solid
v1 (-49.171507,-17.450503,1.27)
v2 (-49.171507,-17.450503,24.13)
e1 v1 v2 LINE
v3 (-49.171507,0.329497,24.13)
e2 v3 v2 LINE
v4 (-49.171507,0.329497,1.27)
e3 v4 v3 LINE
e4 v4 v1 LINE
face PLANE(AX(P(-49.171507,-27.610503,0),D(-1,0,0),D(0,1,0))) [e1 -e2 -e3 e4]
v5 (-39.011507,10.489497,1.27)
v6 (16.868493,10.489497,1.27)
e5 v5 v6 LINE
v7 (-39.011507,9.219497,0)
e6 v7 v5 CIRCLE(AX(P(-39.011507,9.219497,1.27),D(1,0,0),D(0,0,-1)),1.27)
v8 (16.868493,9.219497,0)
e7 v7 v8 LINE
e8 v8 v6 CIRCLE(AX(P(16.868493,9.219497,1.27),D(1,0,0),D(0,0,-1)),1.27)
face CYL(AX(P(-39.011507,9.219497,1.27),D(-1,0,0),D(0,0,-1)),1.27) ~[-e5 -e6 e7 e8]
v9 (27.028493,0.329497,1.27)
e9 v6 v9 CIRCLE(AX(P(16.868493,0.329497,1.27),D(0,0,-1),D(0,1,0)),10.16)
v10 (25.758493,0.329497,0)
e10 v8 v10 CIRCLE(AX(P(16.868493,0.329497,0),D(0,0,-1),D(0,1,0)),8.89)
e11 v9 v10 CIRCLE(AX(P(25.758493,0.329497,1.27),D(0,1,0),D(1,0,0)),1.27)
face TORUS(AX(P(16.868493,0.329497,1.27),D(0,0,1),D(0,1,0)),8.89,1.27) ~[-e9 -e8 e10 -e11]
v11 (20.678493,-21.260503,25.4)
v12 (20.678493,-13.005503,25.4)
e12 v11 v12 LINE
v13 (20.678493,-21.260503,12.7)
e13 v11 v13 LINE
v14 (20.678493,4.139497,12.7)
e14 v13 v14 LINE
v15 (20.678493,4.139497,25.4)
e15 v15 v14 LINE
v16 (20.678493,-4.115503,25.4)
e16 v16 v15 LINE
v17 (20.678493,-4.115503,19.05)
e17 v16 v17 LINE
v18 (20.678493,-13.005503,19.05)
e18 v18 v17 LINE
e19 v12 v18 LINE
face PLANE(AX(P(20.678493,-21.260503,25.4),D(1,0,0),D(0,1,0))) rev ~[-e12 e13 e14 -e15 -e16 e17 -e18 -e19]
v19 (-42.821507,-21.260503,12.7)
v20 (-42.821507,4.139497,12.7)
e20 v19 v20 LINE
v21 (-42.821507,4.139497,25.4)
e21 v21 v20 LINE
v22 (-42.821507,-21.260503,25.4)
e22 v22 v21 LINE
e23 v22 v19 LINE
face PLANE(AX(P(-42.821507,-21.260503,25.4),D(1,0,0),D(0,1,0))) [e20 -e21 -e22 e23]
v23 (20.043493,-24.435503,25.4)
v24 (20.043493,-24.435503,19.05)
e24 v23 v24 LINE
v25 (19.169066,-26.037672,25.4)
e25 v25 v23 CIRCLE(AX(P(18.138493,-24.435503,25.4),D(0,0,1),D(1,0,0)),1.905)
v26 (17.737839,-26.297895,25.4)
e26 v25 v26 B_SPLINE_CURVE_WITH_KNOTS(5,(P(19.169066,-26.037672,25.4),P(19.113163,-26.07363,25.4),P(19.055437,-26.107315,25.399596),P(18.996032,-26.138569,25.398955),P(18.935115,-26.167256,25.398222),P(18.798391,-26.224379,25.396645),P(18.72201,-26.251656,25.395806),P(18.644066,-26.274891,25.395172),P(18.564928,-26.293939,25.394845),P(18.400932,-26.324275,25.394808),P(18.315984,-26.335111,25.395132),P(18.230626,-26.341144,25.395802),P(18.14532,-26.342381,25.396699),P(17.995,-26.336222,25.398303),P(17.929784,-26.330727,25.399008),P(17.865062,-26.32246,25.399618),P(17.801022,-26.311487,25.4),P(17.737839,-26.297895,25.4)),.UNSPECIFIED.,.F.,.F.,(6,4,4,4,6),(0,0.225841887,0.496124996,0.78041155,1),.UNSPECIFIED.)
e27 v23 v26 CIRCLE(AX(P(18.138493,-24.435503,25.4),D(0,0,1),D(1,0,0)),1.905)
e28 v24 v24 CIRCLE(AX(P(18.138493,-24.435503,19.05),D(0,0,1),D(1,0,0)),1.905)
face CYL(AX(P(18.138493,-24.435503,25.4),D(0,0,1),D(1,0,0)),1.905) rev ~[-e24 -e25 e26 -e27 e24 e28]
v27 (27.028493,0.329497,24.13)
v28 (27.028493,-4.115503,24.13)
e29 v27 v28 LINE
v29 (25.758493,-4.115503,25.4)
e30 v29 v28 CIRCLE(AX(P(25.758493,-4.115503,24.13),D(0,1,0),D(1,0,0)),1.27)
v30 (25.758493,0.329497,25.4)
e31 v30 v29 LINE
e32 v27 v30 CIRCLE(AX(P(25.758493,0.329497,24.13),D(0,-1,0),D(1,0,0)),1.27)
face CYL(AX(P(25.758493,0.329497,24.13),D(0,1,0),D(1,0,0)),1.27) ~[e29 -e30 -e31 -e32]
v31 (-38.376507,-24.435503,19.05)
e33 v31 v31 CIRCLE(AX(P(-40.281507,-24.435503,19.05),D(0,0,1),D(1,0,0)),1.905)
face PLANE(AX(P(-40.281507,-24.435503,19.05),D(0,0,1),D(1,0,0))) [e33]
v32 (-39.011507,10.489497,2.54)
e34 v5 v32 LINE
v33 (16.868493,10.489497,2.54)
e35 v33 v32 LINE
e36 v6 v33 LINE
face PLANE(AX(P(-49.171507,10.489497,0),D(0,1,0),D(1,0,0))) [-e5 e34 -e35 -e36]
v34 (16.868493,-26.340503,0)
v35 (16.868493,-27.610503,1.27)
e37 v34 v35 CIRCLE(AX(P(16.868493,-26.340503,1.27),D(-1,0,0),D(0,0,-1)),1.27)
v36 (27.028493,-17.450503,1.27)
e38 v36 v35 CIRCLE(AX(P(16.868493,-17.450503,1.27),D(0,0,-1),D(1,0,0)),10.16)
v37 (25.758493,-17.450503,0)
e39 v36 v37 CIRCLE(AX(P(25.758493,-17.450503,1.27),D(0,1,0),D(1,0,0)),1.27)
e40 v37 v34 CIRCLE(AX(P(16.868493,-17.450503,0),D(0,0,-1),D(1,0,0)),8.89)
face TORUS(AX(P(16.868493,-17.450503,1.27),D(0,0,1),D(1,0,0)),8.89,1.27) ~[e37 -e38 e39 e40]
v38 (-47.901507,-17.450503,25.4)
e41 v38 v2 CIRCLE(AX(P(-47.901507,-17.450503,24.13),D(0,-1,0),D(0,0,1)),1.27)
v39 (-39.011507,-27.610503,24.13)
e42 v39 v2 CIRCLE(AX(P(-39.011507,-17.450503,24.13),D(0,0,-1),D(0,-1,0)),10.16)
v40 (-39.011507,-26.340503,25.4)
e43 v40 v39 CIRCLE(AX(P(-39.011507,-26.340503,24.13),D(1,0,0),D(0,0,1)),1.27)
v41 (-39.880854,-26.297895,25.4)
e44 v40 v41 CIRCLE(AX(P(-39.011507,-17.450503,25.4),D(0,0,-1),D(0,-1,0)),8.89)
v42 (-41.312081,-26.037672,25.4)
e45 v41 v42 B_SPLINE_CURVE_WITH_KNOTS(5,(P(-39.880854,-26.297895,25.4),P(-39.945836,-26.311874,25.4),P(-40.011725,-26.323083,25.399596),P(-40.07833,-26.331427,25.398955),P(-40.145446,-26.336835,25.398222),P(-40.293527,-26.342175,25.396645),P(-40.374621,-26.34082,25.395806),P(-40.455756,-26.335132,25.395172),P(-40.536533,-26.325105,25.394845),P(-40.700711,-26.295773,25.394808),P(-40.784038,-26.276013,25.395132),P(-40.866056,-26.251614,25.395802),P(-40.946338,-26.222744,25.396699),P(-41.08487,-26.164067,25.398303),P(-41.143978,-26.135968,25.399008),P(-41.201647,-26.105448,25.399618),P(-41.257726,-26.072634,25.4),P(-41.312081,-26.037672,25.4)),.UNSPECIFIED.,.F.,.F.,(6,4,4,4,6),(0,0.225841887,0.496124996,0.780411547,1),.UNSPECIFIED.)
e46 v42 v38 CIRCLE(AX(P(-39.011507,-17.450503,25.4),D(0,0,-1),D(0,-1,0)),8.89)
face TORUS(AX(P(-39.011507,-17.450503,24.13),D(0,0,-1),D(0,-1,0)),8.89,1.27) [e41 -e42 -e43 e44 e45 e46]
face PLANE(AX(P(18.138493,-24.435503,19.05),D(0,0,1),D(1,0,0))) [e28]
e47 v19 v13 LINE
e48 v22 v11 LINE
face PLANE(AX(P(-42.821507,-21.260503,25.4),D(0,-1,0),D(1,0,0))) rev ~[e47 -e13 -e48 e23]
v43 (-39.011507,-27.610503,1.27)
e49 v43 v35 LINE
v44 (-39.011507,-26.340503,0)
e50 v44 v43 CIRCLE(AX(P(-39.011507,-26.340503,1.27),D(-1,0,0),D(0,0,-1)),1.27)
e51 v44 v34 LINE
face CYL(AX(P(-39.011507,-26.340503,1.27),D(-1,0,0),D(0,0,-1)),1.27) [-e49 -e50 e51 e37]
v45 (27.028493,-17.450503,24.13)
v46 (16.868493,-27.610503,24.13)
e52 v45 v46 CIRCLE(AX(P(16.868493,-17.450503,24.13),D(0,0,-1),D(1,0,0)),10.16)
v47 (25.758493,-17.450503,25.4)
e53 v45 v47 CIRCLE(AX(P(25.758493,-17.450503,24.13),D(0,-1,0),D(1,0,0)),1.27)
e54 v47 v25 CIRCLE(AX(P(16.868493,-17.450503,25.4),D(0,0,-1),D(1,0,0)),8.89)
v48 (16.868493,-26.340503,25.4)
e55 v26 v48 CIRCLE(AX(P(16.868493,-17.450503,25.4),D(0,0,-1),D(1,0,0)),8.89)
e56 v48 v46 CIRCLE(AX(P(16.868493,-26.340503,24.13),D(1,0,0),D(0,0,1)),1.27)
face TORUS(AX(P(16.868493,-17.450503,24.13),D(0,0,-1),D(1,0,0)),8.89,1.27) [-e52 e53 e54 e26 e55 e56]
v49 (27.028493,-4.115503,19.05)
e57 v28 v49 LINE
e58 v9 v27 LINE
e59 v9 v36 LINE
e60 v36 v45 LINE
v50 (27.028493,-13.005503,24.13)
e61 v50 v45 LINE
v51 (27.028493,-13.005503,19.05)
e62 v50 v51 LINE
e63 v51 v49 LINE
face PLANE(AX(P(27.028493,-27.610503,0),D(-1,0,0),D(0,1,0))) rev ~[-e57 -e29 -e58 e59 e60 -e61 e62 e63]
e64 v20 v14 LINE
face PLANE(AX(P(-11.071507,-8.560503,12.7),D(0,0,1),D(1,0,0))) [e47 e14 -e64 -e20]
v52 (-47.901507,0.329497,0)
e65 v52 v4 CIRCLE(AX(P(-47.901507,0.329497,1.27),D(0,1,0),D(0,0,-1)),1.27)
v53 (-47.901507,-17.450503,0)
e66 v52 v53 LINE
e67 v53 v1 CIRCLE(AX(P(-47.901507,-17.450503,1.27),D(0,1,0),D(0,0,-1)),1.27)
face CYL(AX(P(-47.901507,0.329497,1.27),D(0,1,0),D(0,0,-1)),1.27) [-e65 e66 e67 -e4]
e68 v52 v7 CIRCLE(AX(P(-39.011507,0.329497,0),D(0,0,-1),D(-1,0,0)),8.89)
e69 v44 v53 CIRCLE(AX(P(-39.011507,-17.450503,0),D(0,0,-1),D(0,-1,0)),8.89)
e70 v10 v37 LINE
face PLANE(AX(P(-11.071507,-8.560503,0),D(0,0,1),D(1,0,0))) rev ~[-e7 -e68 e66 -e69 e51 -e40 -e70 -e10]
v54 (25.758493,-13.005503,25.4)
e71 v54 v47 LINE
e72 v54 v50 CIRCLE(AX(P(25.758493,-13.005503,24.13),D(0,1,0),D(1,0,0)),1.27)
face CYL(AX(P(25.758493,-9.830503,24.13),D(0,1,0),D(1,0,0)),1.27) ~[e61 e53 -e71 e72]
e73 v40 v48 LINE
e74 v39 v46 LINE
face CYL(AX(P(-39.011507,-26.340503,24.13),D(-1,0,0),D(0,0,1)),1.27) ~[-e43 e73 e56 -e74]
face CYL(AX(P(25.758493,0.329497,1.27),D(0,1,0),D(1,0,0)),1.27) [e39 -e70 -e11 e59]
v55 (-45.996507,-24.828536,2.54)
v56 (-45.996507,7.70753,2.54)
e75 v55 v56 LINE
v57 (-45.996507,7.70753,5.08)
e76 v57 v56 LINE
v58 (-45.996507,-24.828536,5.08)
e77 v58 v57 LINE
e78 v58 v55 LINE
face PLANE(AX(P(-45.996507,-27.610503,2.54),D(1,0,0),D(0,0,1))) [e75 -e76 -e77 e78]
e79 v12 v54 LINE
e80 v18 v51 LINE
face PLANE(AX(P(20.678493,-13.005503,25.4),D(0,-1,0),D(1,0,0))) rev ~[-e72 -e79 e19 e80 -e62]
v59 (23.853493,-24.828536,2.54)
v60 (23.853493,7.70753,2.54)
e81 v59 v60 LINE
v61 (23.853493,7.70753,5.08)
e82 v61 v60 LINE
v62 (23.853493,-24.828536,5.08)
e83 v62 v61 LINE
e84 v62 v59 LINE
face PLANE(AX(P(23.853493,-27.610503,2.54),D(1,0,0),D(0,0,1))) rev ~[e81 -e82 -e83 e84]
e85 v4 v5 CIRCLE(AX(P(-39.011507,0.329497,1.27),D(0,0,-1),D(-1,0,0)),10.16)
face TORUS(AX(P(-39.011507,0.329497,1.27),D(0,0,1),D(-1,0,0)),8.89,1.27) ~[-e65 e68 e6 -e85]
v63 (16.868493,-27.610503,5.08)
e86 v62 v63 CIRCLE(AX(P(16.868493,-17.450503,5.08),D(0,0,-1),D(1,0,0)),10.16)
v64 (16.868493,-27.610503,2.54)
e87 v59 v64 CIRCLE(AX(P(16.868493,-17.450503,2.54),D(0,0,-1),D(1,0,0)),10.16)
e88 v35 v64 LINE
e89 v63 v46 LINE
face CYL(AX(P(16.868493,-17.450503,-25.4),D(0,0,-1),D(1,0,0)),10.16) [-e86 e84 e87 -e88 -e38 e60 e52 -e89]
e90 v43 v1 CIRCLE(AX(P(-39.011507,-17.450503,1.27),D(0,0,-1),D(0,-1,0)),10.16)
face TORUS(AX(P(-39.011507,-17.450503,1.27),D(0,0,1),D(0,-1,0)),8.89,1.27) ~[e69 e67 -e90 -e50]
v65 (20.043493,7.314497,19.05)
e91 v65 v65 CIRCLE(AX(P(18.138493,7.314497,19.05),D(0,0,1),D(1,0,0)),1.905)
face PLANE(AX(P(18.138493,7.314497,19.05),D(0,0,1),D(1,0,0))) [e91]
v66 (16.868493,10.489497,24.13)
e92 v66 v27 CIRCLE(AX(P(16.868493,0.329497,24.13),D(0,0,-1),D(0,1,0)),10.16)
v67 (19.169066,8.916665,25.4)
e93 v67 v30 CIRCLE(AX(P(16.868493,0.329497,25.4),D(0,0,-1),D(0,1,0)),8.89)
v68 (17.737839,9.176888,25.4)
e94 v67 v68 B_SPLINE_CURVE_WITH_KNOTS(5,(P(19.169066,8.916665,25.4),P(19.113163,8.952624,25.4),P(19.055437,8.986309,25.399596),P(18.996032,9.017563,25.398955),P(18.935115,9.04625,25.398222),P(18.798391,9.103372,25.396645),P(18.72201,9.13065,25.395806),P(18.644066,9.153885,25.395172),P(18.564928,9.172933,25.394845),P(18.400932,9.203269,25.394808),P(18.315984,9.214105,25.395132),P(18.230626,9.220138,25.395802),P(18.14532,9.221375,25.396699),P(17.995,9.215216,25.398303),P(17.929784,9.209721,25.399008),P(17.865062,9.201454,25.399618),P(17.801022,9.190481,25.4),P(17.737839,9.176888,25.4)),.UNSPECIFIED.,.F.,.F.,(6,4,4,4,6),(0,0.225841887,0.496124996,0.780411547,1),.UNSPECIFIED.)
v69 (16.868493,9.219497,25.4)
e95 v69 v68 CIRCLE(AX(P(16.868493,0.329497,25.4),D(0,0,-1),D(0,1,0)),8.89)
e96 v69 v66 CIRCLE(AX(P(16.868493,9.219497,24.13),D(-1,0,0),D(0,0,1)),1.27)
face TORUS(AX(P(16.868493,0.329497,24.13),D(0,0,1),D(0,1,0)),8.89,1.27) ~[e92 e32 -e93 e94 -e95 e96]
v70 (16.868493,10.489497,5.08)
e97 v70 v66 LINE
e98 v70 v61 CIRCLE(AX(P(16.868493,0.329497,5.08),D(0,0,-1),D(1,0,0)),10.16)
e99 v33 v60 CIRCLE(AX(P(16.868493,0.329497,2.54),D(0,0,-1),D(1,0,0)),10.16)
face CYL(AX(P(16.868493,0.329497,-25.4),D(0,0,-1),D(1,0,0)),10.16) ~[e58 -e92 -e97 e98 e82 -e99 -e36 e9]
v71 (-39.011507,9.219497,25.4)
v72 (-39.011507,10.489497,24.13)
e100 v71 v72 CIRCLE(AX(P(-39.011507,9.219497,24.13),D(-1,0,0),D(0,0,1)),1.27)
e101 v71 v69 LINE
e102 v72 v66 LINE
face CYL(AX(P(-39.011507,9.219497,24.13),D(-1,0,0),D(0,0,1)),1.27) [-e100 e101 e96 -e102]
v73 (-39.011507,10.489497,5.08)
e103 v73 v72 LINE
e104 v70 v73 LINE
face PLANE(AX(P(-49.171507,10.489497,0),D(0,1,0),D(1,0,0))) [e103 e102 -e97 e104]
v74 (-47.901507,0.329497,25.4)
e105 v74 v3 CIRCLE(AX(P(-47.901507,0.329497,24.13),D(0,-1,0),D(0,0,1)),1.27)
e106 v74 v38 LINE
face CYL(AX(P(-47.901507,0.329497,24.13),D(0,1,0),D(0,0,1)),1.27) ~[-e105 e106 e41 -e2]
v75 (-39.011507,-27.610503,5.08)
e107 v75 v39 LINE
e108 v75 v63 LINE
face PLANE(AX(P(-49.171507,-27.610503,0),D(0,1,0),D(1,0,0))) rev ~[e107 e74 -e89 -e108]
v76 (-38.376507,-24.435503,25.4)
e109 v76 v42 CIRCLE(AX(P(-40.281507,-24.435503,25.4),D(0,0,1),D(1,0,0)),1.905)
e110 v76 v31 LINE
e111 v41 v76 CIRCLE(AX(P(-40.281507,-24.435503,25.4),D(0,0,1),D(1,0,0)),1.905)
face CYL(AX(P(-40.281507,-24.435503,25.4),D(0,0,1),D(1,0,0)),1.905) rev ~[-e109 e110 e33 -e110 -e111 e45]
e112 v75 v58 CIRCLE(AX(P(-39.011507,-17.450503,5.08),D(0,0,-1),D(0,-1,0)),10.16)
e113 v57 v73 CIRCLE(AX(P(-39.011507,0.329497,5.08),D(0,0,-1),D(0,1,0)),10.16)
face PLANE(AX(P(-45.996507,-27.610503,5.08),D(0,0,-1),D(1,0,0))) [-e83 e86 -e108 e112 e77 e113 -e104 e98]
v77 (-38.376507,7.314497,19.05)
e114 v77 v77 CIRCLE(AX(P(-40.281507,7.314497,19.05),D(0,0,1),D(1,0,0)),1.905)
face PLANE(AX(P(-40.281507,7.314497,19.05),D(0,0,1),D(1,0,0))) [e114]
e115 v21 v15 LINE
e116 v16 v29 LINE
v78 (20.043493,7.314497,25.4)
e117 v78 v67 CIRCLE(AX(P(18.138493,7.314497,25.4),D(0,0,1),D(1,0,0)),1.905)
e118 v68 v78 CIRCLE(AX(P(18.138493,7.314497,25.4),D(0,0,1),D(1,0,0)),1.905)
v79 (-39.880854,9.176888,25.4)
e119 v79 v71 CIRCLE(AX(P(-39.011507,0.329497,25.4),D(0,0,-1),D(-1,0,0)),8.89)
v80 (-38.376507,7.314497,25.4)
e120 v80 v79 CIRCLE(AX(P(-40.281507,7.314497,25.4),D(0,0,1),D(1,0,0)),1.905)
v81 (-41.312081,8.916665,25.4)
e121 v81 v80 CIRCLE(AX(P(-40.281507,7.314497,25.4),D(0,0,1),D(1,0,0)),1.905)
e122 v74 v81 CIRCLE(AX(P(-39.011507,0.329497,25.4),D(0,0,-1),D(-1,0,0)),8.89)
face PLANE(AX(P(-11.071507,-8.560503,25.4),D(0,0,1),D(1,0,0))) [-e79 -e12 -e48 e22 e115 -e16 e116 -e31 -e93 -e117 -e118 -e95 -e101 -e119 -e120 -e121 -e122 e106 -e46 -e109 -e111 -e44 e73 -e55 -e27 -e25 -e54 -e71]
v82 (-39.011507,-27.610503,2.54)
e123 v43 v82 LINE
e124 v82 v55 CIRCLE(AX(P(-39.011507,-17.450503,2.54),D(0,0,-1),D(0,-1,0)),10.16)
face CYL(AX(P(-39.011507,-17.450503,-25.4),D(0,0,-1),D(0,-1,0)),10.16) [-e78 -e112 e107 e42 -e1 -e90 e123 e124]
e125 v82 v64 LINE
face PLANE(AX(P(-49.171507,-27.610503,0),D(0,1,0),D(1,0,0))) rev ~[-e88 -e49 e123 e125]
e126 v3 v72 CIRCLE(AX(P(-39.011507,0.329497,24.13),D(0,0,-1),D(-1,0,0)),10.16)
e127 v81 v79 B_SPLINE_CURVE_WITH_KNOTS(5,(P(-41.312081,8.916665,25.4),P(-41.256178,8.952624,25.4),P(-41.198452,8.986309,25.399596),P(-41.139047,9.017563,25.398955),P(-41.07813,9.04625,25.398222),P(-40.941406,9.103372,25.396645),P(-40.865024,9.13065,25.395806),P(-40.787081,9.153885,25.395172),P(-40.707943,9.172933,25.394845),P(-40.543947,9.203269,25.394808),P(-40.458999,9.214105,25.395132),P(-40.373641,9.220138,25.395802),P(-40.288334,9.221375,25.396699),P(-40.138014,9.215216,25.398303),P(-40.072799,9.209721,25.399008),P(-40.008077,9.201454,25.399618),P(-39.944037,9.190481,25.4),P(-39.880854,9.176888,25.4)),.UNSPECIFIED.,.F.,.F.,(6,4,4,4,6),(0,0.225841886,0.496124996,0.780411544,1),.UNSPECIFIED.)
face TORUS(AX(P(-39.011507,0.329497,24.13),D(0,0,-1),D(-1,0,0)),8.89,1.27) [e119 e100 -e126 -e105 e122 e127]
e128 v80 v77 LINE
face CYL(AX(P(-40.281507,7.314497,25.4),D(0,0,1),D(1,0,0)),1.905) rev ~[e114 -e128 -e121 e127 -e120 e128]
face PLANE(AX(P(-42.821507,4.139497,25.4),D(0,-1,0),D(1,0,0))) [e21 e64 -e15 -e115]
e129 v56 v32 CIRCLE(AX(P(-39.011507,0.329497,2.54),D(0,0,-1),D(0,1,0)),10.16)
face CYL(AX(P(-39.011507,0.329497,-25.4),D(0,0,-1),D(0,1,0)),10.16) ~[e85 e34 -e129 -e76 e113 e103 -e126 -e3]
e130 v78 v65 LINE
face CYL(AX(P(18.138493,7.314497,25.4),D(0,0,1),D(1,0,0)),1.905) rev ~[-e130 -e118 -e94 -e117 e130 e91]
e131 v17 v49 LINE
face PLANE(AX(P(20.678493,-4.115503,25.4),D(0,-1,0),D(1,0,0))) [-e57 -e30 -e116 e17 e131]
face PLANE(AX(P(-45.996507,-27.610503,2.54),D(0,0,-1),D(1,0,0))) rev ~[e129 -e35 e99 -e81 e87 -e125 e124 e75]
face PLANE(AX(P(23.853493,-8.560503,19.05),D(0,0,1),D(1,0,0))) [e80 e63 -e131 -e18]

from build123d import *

# Parameters (mm, degrees)
F0_W          = 76.2
F0_H          = 38.1
F1_DEPTH      = 25.4
F2_W          = 69.85
F2_H          = 2.54
F3_DEPTH      = 38.101
F4_W          = 63.5
F4_H          = 25.4
F5_DEPTH      = 12.7
F6_W          = 6.35
F6_H          = 8.89
F7_DEPTH      = 6.35
F8_R          = 1.905
F9_DEPTH      = 6.35
F10_T1_DEPTH  = 76.2
F11_T1_DEPTH  = 17.78
F11_T3_DEPTH  = 55.88
F11_T5_DEPTH  = 7.62
F11_T7_DEPTH  = 7.62
F11_T10_ANGLE = 90.0000000017
F11_T12_ANGLE = 89.9999999998
F11_T14_ANGLE = 89.9999999979
F11_T16_ANGLE = 89.9999999998
F11_T18_ANGLE = 89.9999999998
F11_T20_ANGLE = 89.9999999998
F11_T22_ANGLE = 89.9999999979
F11_T24_ANGLE = 90.0000000017


# Not quite as in the source:
# - a fillet or chamfer that OpenCascade refuses, or shapes differently, is made with other operations: its cross-section is extruded or revolved along the edge and cut away or added


with BuildPart() as f1:
    # F0 (on Top) → F1 (new body)
    with BuildSketch(Plane.XY):
        with Locations((-11.0715073586, -8.5605031371)):
            Rectangle(F0_W, F0_H)
    extrude(amount=F1_DEPTH)

    # F2 (on face) → F3 (cut, through all)
    with BuildSketch(Plane.XZ.offset(27.6105031371)):
        with Locations((-11.0715073586, 3.81)):
            Rectangle(F2_W, F2_H)
    extrude(amount=-F3_DEPTH, mode=Mode.SUBTRACT)

    # F4 (on face) → F5 (cut)
    with BuildSketch(Plane.XY.offset(25.4)):
        with Locations((-11.0715073586, -8.5605031371)):
            Rectangle(F4_W, F4_H)
    extrude(amount=-F5_DEPTH, mode=Mode.SUBTRACT)

    # F6 (on face) → F7 (cut)
    with BuildSketch(Plane.XY.offset(25.4)):
        with Locations((23.8534926414, -8.5605031371)):
            Rectangle(F6_W, F6_H)
    extrude(amount=-F7_DEPTH, mode=Mode.SUBTRACT)

    # F8 (on face) → F9 (cut)
    with BuildSketch(Plane.XY.offset(25.4)):
        with Locations((-40.2815073586, 7.3144968629)):
            Circle(F8_R)
        with Locations((18.1384926414, 7.3144968629)):
            Circle(F8_R)
        with Locations((-40.2815073586, -24.4355031371)):
            Circle(F8_R)
        with Locations((18.1384926414, -24.4355031371)):
            Circle(F8_R)
    extrude(amount=-F9_DEPTH, mode=Mode.SUBTRACT)

    # F10: fillet of radius 10.16 on 4 edges, made by hand

    # F10_s2 → F10_t1 (cut)
    with BuildSketch(Plane.XY.offset(-25.4)):
        with BuildLine():
            ThreePointArc((-39.0115073586, -27.6105031371), (-46.1957122554, -24.634708034), (-49.1715073586, -17.4505031371))
            Line((-49.1715073586, -17.4505031371), (-49.1715073586, -27.6105031371))
            Line((-49.1715073586, -27.6105031371), (-39.0115073586, -27.6105031371))
        make_face()
        with BuildLine():
            ThreePointArc((27.0284926414, -17.4505031371), (24.0526975383, -24.634708034), (16.8684926414, -27.6105031371))
            Line((16.8684926414, -27.6105031371), (27.0284926414, -27.6105031371))
            Line((27.0284926414, -27.6105031371), (27.0284926414, -17.4505031371))
        make_face()
        with BuildLine():
            ThreePointArc((27.0284926414, 0.3294968629), (24.0526975383, 7.5137017597), (16.8684926414, 10.4894968629))
            Line((16.8684926414, 10.4894968629), (27.0284926414, 10.4894968629))
            Line((27.0284926414, 10.4894968629), (27.0284926414, 0.3294968629))
        make_face()
        with BuildLine():
            ThreePointArc((-39.0115073586, 10.4894968629), (-46.1957122554, 7.5137017597), (-49.1715073586, 0.3294968629))
            Line((-49.1715073586, 0.3294968629), (-49.1715073586, 10.4894968629))
            Line((-49.1715073586, 10.4894968629), (-39.0115073586, 10.4894968629))
        make_face()
    extrude(amount=F10_T1_DEPTH, mode=Mode.SUBTRACT)

    # F11: fillet of radius 1.27 on 17 edges, made by hand

    # F11_s2 → F11_t1 (cut)
    with BuildSketch(Plane.XZ.offset(-0.3294968629)):
        with BuildLine():
            ThreePointArc((-47.9015073586, 25.4), (-48.7995329707, 25.0280256121), (-49.1715073586, 24.13))
            Line((-49.1715073586, 24.13), (-49.1715073586, 25.4))
            Line((-49.1715073586, 25.4), (-47.9015073586, 25.4))
        make_face()
        with BuildLine():
            ThreePointArc((27.0284926414, 1.27), (26.6565182536, 0.3719743879), (25.7584926414, 0))
            Line((25.7584926414, 0), (27.0284926414, 0))
            Line((27.0284926414, 0), (27.0284926414, 1.27))
        make_face()
        with BuildLine():
            ThreePointArc((-47.9015073586, 0), (-48.7995329707, 0.3719743879), (-49.1715073586, 1.27))
            Line((-49.1715073586, 1.27), (-49.1715073586, 0))
            Line((-49.1715073586, 0), (-47.9015073586, 0))
        make_face()
    extrude(amount=F11_T1_DEPTH, mode=Mode.SUBTRACT)

    # F11_s4 → F11_t3 (cut)
    with BuildSketch(Plane.YZ.offset(-39.0115073586)):
        with BuildLine():
            ThreePointArc((9.2194968629, 0), (10.117522475, 0.3719743879), (10.4894968629, 1.27))
            Line((10.4894968629, 1.27), (10.4894968629, 0))
            Line((10.4894968629, 0), (9.2194968629, 0))
        make_face()
        with BuildLine():
            ThreePointArc((-26.3405031371, 0), (-27.2385287492, 0.3719743879), (-27.6105031371, 1.27))
            Line((-27.6105031371, 1.27), (-27.6105031371, 0))
            Line((-27.6105031371, 0), (-26.3405031371, 0))
        make_face()
        with BuildLine():
            ThreePointArc((9.2194968629, 25.4), (10.117522475, 25.0280256121), (10.4894968629, 24.13))
            Line((10.4894968629, 24.13), (10.4894968629, 25.4))
            Line((10.4894968629, 25.4), (9.2194968629, 25.4))
        make_face()
        with BuildLine():
            ThreePointArc((-26.3405031371, 25.4), (-27.2385287492, 25.0280256121), (-27.6105031371, 24.13))
            Line((-27.6105031371, 24.13), (-27.6105031371, 25.4))
            Line((-27.6105031371, 25.4), (-26.3405031371, 25.4))
        make_face()
    extrude(amount=F11_T3_DEPTH, mode=Mode.SUBTRACT)

    # F11_s6 → F11_t5 (cut)
    with BuildSketch(Plane.XZ.offset(-0.3294968629)):
        with BuildLine():
            ThreePointArc((27.0284926414, 24.13), (26.6565182536, 25.0280256121), (25.7584926414, 25.4))
            Line((25.7584926414, 25.4), (27.0284926414, 25.4))
            Line((27.0284926414, 25.4), (27.0284926414, 24.13))
        make_face()
    extrude(amount=F11_T5_DEPTH, mode=Mode.SUBTRACT)

    # F11_s8 → F11_t7 (cut)
    with BuildSketch(Plane.XZ.offset(9.8305031371)):
        with BuildLine():
            ThreePointArc((27.0284926414, 24.13), (26.6565182536, 25.0280256121), (25.7584926414, 25.4))
            Line((25.7584926414, 25.4), (27.0284926414, 25.4))
            Line((27.0284926414, 25.4), (27.0284926414, 24.13))
        make_face()
    extrude(amount=F11_T7_DEPTH, mode=Mode.SUBTRACT)

    # F11_s9 → F11_t10 (revolve, cut)
    with BuildSketch(Plane.XZ.offset(17.4505031373)):
        with BuildLine():
            ThreePointArc((25.7584926414, 0), (26.6565182535, 0.3719743879), (27.0284926414, 1.27))
            Line((27.0284926414, 1.27), (27.0284926414, 0))
            Line((27.0284926414, 0), (25.7584926414, 0))
        make_face()
    revolve(axis=Axis((16.8684926416, -17.4505031373, 0), (0, 0, -1)), revolution_arc=F11_T10_ANGLE, mode=Mode.SUBTRACT)

    # F11_s11 → F11_t12 (revolve, cut)
    with BuildSketch(Plane.YZ.offset(-39.0115073586)):
        with BuildLine():
            ThreePointArc((-26.3405031371, 0), (-27.2385287492, 0.3719743879), (-27.6105031371, 1.27))
            Line((-27.6105031371, 1.27), (-27.6105031371, 0))
            Line((-27.6105031371, 0), (-26.3405031371, 0))
        make_face()
    revolve(axis=Axis((-39.0115073586, -17.4505031371, 0), (0, 0, -1)), revolution_arc=F11_T12_ANGLE, mode=Mode.SUBTRACT)

    # F11_s13 → F11_t14 (revolve, cut)
    with BuildSketch(Plane.XZ.offset(-0.3294968627)):
        with BuildLine():
            ThreePointArc((-47.9015073586, 0), (-48.7995329707, 0.3719743879), (-49.1715073586, 1.27))
            Line((-49.1715073586, 1.27), (-49.1715073586, 0))
            Line((-49.1715073586, 0), (-47.9015073586, 0))
        make_face()
    revolve(axis=Axis((-39.0115073584, 0.3294968627, 0), (0, 0, -1)), revolution_arc=F11_T14_ANGLE, mode=Mode.SUBTRACT)

    # F11_s15 → F11_t16 (revolve, cut)
    with BuildSketch(Plane.YZ.offset(16.8684926414)):
        with BuildLine():
            ThreePointArc((9.2194968629, 0), (10.117522475, 0.3719743879), (10.4894968629, 1.27))
            Line((10.4894968629, 1.27), (10.4894968629, 0))
            Line((10.4894968629, 0), (9.2194968629, 0))
        make_face()
    revolve(axis=Axis((16.8684926414, 0.3294968629, 0), (0, 0, -1)), revolution_arc=F11_T16_ANGLE, mode=Mode.SUBTRACT)

    # F11_s17 → F11_t18 (revolve, cut)
    with BuildSketch(Plane.YZ.offset(16.8684926414)):
        with BuildLine():
            ThreePointArc((10.4894968629, 24.13), (10.117522475, 25.0280256121), (9.2194968629, 25.4))
            Line((9.2194968629, 25.4), (10.4894968629, 25.4))
            Line((10.4894968629, 25.4), (10.4894968629, 24.13))
        make_face()
    revolve(axis=Axis((16.8684926414, 0.3294968629, 25.4), (0, 0, -1)), revolution_arc=F11_T18_ANGLE, mode=Mode.SUBTRACT)

    # F11_s19 → F11_t20 (revolve, cut)
    with BuildSketch(Plane.YZ.offset(-39.0115073586)):
        with BuildLine():
            ThreePointArc((-26.3405031371, 25.4), (-27.2385287492, 25.0280256121), (-27.6105031371, 24.13))
            Line((-27.6105031371, 24.13), (-27.6105031371, 25.4))
            Line((-27.6105031371, 25.4), (-26.3405031371, 25.4))
        make_face()
    revolve(axis=Axis((-39.0115073586, -17.4505031371, 25.4), (0, 0, -1)), revolution_arc=F11_T20_ANGLE, mode=Mode.SUBTRACT)

    # F11_s21 → F11_t22 (revolve, cut)
    with BuildSketch(Plane.XZ.offset(-0.3294968627)):
        with BuildLine():
            ThreePointArc((-47.9015073586, 25.4), (-48.7995329707, 25.0280256121), (-49.1715073586, 24.13))
            Line((-49.1715073586, 24.13), (-49.1715073586, 25.4))
            Line((-49.1715073586, 25.4), (-47.9015073586, 25.4))
        make_face()
    revolve(axis=Axis((-39.0115073584, 0.3294968627, 25.4), (0, 0, -1)), revolution_arc=F11_T22_ANGLE, mode=Mode.SUBTRACT)

    # F11_s23 → F11_t24 (revolve, cut)
    with BuildSketch(Plane.XZ.offset(17.4505031373)):
        with BuildLine():
            ThreePointArc((25.7584926414, 25.4), (26.6565182535, 25.0280256121), (27.0284926414, 24.13))
            Line((27.0284926414, 24.13), (27.0284926414, 25.4))
            Line((27.0284926414, 25.4), (25.7584926414, 25.4))
        make_face()
    revolve(axis=Axis((16.8684926416, -17.4505031373, 25.4), (0, 0, -1)), revolution_arc=F11_T24_ANGLE, mode=Mode.SUBTRACT)


solid = f1.part
